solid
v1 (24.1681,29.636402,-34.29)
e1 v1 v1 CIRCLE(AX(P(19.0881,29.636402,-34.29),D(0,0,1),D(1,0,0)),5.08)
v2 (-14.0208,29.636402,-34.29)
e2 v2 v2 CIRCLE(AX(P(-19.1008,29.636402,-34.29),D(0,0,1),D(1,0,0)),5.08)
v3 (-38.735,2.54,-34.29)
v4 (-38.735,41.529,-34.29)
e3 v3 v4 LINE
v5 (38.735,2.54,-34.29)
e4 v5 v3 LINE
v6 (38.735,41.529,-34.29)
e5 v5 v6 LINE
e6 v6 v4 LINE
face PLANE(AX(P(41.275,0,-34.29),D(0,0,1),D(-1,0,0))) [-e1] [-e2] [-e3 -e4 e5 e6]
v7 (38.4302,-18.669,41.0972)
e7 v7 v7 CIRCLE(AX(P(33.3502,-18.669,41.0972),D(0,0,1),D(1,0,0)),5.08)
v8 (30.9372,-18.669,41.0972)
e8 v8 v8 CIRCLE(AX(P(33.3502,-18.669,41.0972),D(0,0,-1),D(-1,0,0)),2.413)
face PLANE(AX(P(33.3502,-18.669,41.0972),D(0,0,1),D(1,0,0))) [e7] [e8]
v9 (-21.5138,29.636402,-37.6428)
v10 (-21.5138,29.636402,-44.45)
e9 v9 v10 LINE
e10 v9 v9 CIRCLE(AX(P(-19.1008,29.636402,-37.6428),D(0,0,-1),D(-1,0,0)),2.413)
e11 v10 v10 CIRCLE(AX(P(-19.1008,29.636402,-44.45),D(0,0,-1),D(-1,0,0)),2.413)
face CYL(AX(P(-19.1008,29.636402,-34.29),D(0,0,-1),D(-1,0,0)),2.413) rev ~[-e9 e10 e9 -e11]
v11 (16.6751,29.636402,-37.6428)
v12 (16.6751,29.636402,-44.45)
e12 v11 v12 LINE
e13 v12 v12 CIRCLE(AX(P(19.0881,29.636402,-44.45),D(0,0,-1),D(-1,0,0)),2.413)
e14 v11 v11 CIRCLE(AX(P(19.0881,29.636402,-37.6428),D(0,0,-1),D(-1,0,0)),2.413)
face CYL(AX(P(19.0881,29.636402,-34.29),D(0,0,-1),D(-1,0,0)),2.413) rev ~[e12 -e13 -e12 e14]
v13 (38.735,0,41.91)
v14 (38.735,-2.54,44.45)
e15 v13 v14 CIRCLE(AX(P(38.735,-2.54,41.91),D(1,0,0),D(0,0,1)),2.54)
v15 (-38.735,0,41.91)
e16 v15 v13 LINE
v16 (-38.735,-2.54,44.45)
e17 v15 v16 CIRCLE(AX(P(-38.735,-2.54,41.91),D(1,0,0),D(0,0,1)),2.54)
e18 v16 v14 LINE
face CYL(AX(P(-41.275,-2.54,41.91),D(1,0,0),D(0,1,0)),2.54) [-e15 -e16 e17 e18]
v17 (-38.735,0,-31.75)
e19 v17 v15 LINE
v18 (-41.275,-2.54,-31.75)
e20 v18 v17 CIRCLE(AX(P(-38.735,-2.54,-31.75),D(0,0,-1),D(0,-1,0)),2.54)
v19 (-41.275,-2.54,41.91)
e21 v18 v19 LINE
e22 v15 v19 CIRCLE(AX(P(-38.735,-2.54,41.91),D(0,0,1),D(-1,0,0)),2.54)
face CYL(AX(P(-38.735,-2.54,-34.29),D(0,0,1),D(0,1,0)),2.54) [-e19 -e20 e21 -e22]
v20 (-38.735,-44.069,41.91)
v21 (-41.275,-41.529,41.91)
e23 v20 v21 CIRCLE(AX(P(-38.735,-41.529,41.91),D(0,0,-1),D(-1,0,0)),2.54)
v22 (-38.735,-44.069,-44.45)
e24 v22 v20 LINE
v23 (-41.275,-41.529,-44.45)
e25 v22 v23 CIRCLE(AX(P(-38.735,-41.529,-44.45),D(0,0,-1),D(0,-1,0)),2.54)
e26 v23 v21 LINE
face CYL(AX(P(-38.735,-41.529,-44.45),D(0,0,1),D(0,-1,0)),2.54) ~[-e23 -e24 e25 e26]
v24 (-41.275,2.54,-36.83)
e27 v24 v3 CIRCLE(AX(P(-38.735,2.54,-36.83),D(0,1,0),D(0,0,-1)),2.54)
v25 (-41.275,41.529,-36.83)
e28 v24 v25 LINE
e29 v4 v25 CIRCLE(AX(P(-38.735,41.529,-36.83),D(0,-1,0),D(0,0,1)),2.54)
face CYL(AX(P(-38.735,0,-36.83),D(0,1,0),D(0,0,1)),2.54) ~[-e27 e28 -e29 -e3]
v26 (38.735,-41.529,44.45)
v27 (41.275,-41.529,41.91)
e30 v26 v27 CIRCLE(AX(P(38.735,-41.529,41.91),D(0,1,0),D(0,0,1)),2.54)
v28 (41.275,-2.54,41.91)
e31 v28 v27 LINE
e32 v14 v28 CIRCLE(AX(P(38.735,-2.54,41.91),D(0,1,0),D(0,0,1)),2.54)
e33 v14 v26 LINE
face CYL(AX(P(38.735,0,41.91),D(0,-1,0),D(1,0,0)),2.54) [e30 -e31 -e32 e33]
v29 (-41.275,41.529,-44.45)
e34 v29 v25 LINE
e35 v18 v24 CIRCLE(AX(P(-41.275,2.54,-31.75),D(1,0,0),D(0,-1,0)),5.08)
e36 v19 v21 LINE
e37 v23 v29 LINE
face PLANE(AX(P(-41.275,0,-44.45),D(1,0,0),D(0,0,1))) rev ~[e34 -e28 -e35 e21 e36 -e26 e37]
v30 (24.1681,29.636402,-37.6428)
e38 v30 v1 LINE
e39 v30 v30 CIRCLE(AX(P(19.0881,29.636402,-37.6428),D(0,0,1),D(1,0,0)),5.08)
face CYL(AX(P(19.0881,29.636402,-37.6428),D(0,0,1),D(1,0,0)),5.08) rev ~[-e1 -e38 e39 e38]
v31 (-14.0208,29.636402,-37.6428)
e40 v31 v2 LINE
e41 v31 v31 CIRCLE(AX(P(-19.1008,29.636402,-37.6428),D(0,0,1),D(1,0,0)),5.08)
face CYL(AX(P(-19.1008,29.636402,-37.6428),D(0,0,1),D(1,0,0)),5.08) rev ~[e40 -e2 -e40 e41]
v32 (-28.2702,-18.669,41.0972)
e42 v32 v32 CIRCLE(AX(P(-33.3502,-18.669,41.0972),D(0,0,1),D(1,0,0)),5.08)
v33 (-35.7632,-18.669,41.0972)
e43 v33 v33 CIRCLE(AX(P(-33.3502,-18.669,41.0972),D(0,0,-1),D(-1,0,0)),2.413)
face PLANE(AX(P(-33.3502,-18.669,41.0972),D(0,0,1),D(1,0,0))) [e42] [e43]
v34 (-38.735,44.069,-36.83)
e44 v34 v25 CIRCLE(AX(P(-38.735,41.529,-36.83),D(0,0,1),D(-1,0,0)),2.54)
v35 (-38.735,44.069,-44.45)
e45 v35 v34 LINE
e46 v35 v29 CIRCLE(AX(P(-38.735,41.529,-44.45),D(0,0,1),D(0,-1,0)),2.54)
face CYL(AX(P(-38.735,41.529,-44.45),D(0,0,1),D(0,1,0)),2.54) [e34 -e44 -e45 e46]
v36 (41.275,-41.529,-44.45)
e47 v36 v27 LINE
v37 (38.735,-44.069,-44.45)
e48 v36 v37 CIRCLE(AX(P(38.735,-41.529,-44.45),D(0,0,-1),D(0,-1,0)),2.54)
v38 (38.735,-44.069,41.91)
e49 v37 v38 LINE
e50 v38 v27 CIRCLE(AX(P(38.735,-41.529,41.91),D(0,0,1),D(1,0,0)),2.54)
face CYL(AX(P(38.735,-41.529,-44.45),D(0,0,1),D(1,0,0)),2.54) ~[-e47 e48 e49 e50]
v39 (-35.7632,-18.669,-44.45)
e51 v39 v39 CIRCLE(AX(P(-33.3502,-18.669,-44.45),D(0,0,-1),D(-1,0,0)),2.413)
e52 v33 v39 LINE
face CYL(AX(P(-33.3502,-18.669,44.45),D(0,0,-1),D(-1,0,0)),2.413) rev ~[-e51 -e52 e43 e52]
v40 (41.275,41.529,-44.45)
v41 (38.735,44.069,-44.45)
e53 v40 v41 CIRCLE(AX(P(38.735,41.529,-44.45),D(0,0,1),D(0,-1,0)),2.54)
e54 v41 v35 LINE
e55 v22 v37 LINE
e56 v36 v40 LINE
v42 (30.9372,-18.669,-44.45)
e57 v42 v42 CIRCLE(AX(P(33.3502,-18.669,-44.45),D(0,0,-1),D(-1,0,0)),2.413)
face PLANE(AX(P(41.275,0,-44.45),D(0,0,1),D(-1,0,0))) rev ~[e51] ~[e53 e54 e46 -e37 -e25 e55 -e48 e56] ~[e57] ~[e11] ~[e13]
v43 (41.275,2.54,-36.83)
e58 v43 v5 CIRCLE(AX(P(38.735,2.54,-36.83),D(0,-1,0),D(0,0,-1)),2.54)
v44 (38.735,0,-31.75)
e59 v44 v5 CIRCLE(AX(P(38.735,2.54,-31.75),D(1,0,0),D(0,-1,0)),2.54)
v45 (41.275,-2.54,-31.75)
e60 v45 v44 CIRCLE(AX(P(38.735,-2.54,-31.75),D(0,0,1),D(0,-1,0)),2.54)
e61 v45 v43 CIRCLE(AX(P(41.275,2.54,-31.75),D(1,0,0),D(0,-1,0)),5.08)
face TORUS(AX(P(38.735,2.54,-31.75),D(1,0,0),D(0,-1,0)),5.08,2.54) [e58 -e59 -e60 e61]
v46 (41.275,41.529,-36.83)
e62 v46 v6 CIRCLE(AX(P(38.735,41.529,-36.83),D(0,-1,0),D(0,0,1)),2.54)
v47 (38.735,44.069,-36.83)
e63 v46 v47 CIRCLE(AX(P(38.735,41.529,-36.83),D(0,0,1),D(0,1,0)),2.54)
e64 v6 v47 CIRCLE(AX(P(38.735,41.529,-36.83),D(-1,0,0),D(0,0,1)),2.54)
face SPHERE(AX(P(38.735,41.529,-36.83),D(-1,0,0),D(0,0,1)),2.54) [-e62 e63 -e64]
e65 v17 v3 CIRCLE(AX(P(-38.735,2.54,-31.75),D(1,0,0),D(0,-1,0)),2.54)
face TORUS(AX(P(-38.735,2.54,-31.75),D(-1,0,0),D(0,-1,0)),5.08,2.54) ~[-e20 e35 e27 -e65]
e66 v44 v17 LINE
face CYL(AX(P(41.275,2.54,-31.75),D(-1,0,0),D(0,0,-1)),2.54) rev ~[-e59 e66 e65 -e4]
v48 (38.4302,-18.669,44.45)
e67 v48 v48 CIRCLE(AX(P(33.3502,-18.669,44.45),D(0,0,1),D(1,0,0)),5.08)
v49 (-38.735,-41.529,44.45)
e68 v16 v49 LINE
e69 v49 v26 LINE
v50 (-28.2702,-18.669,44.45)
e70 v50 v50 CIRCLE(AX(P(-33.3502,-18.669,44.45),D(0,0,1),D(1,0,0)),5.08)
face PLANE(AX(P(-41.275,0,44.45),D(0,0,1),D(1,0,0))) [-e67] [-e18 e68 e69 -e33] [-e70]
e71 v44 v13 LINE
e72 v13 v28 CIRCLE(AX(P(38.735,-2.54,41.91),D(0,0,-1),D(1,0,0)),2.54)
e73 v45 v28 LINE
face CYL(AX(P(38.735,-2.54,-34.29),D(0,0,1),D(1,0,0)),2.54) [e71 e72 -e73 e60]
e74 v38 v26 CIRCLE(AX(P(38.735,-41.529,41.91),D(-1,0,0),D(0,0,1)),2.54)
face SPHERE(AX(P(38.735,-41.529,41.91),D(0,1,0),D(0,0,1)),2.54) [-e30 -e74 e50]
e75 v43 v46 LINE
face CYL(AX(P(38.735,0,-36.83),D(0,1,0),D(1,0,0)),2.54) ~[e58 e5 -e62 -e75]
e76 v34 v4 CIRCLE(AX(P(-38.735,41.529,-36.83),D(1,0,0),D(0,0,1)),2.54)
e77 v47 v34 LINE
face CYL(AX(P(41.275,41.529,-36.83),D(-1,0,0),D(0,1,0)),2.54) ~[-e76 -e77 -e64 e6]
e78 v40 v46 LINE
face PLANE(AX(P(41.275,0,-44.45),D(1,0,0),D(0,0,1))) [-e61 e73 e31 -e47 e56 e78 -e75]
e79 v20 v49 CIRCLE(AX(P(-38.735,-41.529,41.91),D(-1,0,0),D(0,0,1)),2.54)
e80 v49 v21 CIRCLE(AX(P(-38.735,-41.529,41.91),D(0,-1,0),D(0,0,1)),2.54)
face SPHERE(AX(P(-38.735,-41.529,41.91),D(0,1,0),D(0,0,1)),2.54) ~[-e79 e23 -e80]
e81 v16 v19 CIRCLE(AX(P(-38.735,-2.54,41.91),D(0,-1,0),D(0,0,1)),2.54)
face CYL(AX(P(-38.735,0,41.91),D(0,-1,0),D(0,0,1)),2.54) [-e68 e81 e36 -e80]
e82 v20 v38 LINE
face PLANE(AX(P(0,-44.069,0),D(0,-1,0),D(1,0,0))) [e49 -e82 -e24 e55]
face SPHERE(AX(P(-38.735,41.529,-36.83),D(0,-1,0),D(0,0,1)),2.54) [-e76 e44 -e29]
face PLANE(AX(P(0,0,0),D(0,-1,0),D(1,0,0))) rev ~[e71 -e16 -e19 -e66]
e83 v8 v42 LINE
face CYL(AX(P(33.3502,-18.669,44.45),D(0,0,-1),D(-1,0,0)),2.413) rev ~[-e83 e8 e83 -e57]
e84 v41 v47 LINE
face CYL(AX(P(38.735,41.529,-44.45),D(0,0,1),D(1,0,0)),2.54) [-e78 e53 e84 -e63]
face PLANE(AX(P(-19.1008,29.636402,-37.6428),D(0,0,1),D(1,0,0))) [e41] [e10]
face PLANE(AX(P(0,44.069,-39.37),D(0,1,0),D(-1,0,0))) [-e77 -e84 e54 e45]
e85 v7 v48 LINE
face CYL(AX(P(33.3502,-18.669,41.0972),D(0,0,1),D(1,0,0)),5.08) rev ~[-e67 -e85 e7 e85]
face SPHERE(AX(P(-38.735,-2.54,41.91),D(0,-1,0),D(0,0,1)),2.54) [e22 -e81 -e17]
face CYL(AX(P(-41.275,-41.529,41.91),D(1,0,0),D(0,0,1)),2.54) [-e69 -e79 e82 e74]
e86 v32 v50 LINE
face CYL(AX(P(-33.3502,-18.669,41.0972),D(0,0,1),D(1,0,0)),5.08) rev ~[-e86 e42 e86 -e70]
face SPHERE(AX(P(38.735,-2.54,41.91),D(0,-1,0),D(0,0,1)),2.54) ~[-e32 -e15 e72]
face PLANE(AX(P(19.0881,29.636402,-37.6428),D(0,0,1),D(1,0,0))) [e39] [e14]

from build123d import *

# Parameters (mm, degrees)
F0_W           = 82.55
F0_H           = 88.9
F1_DEPTH       = 44.069
F2_W           = 82.55
F2_H           = 10.16
F3_DEPTH       = 44.069
F5_D           = 4.826
F5_CBORE_D     = 10.16
F5_CBORE_DEPTH = 3.3528
F6_R           = 2.54
F8_D           = 4.826
F8_CBORE_D     = 10.16
F8_CBORE_DEPTH = 3.3528


# Not quite as in the source:
# - a feature names something its author has since deleted; it is built from what else it names


with BuildPart() as f1:
    # F0 (on Front) → F1 (new body)
    with BuildSketch(Plane.XZ):
        Rectangle(F0_W, F0_H)
    extrude(amount=F1_DEPTH)

    # F2 (on face) → F3 (join)
    with BuildSketch(Plane(origin=(0, 0, 0), x_dir=(-1, 0, 0), z_dir=(0, 1, 0))):
        with Locations((0, -39.37)):
            Rectangle(F2_W, F2_H)
    extrude(amount=F3_DEPTH)

    # F5 (through all)
    with Locations(Plane.XY.offset(44.45)):
        with Locations((-33.3502, -18.669), (33.3502, -18.669)):
            CounterBoreHole(F5_D / 2, F5_CBORE_D / 2, F5_CBORE_DEPTH)

    # F6
    f6_edges = [f1.edges().sort_by_distance(p)[0] for p in [
        (-41.275, -22.0345, 44.45),
        (41.275, -22.0345, 44.45),
        (0, -44.069, 44.45),
        (0, 0, 44.45),
        (41.275, -44.069, 0),
        (41.275, 0, 5.08),
        (-41.275, -44.069, 0),
        (-41.275, 0, 5.08),
        (-41.275, 22.0345, -34.29),
        (0, 44.069, -34.29),
        (41.275, 22.0345, -34.29),
        (0, 0, -34.29),
        (41.275, 44.069, -39.37),
        (-41.275, 44.069, -39.37),
    ]]
    fillet(f6_edges, radius=F6_R)

    # F8 (through all)
    with Locations(Plane.XY.offset(-34.29)):
        with Locations((-19.1008, 29.6364016831), (19.0881, 29.6364016831)):
            CounterBoreHole(F8_D / 2, F8_CBORE_D / 2, F8_CBORE_DEPTH)


solid = f1.part
